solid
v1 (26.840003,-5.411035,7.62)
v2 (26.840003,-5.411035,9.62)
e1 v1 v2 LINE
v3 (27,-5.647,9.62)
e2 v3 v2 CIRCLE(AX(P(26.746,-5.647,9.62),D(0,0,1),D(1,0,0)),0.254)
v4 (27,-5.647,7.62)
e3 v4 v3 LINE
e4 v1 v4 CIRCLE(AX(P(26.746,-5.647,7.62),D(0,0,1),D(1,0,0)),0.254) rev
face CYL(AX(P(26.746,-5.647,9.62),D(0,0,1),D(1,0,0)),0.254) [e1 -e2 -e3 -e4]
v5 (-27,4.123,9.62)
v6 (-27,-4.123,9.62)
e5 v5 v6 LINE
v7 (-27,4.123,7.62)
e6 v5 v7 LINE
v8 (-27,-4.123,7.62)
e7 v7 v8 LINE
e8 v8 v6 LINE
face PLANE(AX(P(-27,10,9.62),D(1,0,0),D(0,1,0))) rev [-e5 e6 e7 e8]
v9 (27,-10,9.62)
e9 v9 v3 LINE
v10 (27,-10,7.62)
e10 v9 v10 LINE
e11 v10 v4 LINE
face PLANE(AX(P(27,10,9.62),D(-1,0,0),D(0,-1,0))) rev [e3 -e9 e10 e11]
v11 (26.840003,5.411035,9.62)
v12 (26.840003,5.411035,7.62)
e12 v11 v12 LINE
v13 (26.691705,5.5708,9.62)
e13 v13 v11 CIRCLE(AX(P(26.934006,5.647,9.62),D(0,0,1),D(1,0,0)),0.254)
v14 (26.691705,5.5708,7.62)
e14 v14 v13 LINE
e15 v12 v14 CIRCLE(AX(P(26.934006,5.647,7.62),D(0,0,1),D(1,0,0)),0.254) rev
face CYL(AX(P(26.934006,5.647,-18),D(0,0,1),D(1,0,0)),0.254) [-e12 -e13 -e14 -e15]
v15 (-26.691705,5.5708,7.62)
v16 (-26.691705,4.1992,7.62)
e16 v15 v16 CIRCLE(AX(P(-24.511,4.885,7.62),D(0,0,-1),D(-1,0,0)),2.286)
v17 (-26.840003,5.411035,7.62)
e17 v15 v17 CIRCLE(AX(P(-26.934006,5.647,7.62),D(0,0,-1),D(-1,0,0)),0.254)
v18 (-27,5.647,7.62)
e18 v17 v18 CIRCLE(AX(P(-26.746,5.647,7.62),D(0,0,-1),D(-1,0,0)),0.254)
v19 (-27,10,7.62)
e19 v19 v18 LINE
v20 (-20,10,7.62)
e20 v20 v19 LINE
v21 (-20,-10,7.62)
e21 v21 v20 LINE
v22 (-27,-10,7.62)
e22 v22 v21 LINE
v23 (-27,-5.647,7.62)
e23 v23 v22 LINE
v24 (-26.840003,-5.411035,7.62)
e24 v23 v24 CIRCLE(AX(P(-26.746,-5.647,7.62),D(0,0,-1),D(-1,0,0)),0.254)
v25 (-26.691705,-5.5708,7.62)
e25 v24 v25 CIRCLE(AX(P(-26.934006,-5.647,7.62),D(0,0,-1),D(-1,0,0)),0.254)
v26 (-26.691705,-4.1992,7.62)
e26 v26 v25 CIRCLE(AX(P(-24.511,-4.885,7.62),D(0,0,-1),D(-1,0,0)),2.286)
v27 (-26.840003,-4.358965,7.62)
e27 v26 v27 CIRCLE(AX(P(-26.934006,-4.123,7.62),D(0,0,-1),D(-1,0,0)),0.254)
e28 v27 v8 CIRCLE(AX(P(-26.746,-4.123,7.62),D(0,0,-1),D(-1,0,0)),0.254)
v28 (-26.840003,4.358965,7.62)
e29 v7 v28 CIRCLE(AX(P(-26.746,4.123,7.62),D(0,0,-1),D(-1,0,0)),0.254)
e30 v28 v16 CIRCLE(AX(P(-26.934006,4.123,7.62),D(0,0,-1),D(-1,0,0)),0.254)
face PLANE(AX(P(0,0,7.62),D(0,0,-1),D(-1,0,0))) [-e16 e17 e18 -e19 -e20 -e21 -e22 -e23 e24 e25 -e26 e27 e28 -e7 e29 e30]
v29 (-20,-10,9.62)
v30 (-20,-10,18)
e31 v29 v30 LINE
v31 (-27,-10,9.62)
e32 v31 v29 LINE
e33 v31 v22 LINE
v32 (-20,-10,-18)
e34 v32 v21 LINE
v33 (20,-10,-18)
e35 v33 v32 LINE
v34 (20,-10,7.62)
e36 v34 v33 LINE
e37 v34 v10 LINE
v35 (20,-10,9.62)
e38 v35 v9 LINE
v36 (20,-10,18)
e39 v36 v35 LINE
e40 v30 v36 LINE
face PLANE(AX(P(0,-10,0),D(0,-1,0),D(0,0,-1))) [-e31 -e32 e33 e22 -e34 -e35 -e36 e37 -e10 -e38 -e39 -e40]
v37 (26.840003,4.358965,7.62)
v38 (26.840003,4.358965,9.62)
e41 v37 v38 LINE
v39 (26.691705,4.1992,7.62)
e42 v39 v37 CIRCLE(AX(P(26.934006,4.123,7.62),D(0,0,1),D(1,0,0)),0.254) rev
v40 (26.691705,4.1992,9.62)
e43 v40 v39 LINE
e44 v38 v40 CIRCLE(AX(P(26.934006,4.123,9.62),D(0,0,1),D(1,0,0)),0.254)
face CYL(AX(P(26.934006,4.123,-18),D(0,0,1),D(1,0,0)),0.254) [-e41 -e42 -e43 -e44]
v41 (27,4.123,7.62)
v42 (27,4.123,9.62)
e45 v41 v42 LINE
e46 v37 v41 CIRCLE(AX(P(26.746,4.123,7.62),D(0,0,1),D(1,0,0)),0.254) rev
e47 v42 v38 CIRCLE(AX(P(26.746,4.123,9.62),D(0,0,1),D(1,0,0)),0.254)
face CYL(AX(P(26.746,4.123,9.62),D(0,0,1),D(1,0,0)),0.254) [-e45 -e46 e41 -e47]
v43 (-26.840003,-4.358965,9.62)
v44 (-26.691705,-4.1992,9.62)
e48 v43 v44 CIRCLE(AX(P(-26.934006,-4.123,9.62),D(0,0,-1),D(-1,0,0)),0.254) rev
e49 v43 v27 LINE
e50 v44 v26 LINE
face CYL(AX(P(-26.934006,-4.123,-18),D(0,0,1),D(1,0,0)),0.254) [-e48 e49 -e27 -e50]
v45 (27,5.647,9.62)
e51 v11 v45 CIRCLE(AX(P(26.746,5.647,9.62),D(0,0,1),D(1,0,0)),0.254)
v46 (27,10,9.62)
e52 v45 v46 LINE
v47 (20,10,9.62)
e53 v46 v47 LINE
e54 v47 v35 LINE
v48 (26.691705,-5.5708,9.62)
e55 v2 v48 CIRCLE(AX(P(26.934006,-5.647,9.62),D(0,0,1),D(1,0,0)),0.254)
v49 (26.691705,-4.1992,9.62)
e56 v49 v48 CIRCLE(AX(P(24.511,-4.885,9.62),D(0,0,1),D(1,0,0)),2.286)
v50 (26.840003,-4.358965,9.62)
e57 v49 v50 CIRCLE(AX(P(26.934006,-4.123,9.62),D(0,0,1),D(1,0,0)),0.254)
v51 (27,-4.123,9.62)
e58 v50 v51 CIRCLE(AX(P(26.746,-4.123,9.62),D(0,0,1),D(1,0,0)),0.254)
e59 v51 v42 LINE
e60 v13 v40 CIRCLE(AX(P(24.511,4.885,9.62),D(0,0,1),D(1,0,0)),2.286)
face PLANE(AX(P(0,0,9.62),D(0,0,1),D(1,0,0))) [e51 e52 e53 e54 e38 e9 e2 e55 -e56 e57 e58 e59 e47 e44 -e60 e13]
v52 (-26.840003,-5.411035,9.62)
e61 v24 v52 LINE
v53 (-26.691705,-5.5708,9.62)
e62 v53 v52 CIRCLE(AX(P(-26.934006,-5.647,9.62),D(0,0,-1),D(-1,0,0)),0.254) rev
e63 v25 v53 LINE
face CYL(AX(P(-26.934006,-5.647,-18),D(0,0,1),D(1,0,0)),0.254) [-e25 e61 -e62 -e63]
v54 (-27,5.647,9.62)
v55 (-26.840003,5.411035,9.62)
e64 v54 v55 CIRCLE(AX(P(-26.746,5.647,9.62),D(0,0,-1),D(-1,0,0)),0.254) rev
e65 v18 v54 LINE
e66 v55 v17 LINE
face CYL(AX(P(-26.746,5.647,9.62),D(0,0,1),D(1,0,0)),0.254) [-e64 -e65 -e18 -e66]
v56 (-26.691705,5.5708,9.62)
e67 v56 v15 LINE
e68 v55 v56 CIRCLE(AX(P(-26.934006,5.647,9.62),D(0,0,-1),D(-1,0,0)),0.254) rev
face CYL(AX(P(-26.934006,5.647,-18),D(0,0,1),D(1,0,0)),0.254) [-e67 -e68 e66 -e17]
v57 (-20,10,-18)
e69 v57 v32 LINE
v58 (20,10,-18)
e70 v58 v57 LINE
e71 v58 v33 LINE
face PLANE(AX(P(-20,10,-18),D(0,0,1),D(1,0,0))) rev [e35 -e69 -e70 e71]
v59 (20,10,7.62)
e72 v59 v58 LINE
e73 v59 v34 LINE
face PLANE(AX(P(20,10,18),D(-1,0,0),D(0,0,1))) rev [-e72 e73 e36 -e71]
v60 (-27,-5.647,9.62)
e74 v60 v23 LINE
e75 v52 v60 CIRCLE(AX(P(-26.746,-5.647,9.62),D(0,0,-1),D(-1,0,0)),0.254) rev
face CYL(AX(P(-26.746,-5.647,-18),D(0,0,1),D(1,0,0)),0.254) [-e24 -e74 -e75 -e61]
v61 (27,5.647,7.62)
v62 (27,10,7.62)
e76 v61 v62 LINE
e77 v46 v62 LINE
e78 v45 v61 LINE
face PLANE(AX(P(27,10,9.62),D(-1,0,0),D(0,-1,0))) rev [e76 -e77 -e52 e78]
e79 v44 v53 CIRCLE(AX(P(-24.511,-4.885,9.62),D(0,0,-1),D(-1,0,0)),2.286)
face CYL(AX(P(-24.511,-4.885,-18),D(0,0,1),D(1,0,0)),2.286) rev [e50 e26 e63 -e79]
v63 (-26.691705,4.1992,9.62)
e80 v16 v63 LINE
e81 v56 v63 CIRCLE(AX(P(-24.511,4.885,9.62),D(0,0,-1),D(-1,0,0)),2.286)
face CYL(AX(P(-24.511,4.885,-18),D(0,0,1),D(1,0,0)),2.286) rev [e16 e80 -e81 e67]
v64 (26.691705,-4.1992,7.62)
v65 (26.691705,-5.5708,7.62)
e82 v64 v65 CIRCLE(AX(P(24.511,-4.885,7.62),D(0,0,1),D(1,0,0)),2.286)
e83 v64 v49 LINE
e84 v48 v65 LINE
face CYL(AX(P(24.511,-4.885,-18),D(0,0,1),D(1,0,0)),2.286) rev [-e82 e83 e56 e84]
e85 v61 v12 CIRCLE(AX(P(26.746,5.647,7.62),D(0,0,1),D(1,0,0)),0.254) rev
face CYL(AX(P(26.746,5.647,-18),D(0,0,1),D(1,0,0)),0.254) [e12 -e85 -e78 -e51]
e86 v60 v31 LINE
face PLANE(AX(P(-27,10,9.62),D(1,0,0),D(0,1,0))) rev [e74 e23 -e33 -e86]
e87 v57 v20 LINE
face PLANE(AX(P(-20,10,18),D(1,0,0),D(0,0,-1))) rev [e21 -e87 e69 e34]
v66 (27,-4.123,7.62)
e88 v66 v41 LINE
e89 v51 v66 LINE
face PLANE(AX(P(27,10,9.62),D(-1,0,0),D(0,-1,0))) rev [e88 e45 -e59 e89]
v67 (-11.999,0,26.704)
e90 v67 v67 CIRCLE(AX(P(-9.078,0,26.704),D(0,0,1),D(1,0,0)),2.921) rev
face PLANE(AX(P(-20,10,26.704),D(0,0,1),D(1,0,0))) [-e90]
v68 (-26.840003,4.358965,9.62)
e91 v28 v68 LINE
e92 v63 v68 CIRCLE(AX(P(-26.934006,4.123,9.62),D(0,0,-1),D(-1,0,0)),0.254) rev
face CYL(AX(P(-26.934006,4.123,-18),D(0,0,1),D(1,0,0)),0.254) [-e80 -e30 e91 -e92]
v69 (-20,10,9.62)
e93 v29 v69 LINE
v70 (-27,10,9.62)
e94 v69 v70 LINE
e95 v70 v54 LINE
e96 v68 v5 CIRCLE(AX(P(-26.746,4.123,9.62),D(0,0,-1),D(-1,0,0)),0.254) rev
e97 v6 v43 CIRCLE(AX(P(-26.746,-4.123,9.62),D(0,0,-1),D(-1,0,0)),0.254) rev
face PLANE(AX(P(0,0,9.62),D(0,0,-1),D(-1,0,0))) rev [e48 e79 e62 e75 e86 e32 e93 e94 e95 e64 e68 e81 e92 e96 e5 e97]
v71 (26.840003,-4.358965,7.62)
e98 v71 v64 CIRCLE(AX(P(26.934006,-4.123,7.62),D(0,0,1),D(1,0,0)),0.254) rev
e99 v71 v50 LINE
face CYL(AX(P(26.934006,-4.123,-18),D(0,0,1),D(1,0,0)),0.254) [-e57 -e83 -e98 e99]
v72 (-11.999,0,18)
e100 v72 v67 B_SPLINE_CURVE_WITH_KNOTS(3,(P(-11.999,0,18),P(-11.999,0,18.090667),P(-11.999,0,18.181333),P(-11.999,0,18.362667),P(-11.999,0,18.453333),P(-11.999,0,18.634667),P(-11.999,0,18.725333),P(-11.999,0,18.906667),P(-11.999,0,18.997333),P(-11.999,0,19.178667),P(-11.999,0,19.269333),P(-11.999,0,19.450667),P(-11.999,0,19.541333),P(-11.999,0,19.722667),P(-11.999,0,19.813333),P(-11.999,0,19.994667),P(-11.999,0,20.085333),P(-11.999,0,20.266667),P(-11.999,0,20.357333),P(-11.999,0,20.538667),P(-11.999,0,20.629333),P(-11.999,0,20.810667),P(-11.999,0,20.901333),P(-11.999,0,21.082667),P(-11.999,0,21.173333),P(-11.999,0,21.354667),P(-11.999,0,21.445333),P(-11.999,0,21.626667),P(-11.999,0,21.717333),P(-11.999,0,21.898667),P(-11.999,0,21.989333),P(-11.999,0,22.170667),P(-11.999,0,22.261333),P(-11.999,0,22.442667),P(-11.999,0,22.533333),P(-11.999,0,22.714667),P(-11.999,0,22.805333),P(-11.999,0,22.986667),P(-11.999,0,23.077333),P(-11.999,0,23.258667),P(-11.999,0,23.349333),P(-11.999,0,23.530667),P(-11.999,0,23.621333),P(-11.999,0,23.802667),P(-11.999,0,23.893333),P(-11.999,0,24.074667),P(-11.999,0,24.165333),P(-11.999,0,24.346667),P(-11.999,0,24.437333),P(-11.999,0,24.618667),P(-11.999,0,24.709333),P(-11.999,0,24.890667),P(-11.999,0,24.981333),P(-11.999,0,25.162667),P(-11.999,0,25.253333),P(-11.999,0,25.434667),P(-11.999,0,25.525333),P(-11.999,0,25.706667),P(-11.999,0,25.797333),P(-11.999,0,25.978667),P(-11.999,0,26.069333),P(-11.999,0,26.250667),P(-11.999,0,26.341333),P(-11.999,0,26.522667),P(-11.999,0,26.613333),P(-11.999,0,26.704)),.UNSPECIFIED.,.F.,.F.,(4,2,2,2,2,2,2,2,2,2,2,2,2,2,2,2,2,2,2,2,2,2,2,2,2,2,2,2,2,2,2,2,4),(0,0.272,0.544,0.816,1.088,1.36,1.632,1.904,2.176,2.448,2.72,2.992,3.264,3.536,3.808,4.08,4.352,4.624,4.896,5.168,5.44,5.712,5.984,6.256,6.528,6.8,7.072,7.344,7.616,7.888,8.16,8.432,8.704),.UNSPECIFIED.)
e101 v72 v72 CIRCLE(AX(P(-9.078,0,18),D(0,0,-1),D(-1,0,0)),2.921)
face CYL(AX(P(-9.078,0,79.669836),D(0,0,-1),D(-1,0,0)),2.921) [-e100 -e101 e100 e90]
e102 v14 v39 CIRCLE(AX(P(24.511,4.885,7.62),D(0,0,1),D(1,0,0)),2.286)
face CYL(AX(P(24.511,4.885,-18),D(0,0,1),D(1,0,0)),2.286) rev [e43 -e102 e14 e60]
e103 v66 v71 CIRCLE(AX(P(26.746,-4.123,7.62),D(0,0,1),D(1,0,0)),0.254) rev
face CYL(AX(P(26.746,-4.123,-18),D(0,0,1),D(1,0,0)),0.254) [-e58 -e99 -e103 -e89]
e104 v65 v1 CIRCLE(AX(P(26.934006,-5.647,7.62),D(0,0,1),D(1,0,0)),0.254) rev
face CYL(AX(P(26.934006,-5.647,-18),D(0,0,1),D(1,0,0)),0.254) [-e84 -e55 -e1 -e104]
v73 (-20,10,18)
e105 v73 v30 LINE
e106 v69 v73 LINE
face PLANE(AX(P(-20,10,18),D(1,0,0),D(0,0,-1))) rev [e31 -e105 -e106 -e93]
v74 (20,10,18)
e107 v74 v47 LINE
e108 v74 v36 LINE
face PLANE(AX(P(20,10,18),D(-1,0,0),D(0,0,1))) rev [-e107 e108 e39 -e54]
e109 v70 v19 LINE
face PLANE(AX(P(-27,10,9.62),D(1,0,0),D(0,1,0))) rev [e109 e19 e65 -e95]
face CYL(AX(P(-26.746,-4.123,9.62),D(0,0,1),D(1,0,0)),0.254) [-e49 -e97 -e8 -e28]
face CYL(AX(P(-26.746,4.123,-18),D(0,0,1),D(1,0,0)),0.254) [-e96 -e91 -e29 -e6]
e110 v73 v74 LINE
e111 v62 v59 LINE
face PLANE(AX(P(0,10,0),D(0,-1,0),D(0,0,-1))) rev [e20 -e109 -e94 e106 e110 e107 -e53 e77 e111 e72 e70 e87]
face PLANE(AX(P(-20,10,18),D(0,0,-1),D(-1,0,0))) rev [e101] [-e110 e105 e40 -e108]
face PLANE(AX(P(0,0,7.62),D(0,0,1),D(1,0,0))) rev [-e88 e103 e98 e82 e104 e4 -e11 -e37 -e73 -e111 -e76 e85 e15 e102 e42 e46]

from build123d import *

# Parameters (mm, degrees)
SKETCH1_W               = 40
SKETCH1_H               = 36
BOSS_EXTRUDE1_DEPTH     = 10
BOSS_EXTRUDE2_START     = 7.62
SKETCH2_W               = 7
SKETCH2_H               = 20
BOSS_EXTRUDE2_DEPTH     = 2
CUT_EXTRUDE1_DEPTH      = 34.955853693
CUT_EXTRUDE1_DEPTH_BACK = 34.955853693
FILLET1_R               = 0.254
BOSS_EXTRUDE4_START     = 18
SKETCH5_R               = 2.921
BOSS_EXTRUDE4_DEPTH     = 8.704


with BuildPart() as part:
    # Sketch1 → Boss-Extrude1 (new, symmetric)
    with BuildSketch(Plane(origin=(0, 0, 0), x_dir=(1, 0, 0), z_dir=(0, 1, 0))):
        Rectangle(SKETCH1_W, SKETCH1_H)
    extrude(amount=BOSS_EXTRUDE1_DEPTH, both=True)

    # Sketch2 → Boss-Extrude2 (add)
    with BuildSketch(Plane.XY.offset(BOSS_EXTRUDE2_START)):
        with Locations((-23.5, 0)):
            Rectangle(SKETCH2_W, SKETCH2_H)
        with Locations((23.5, 0)):
            Rectangle(SKETCH2_W, SKETCH2_H)
    extrude(amount=BOSS_EXTRUDE2_DEPTH)

    # Sketch4 → Cut-Extrude1 (cut, two sides: drawn at the far end of the back side and taken through both)
    with BuildSketch(Plane.XY.offset(-CUT_EXTRUDE1_DEPTH_BACK)):
        with BuildLine():
            Line((-27, 5.393), (-26.739840954, 5.393))
            ThreePointArc((-26.739840954, 5.393), (-22.225, 4.885), (-26.739840954, 4.377))
            Line((-26.739840954, 4.377), (-27, 4.377))
            Line((-27, 4.377), (-27, 5.393))
        make_face()
        with BuildLine():
            Line((27, 4.377), (26.739840954, 4.377))
            ThreePointArc((26.739840954, 4.377), (22.225, 4.885), (26.739840954, 5.393))
            Line((26.739840954, 5.393), (27, 5.393))
            Line((27, 5.393), (27, 4.377))
        make_face()
        with BuildLine():
            Line((27, -5.393), (26.739840954, -5.393))
            ThreePointArc((26.739840954, -5.393), (22.225, -4.885), (26.739840954, -4.377))
            Line((26.739840954, -4.377), (27, -4.377))
            Line((27, -4.377), (27, -5.393))
        make_face()
        with BuildLine():
            Line((-27, -4.377), (-26.739840954, -4.377))
            ThreePointArc((-26.739840954, -4.377), (-22.225, -4.885), (-26.739840954, -5.393))
            Line((-26.739840954, -5.393), (-27, -5.393))
            Line((-27, -5.393), (-27, -4.377))
        make_face()
    extrude(amount=CUT_EXTRUDE1_DEPTH + CUT_EXTRUDE1_DEPTH_BACK, mode=Mode.SUBTRACT)

    # Fillet1
    # the kernel refuses this fillet: 0.254 mm, written as the material it takes off along each edge
    with BuildSketch(Plane(origin=(26.739840954, -5.393, 7.134588457), x_dir=(1, 0, 0), z_dir=(0, 0, 1)), Plane(origin=(26.739840954, 4.377, 7.134588457), x_dir=(1, 0, 0), z_dir=(0, 0, 1))) as fillet1_piece_1:
        with BuildLine():
            CenterArc((0.194164617, -0.254), FILLET1_R, 90, 72.542396876)
            ThreePointArc((-0.04813594, -0.1778), (-0.022276402, -0.089385033), (0, 0))
            Line((0, 0), (0.194164617, 0))
        make_face()
    extrude(amount=2.970823086, mode=Mode.SUBTRACT)
    with BuildSketch(Plane(origin=(27, -4.377, 10.255), x_dir=(-1, 0, 0), z_dir=(0, 0, -1)), Plane(origin=(-27, 5.393, 10.255), x_dir=(0, 1, 0), z_dir=(0, 0, -1)), Plane(origin=(27, 4.377, 10.255), x_dir=(0, -1, 0), z_dir=(0, 0, -1)), Plane(origin=(27, -5.393, 10.255), x_dir=(0, -1, 0), z_dir=(0, 0, -1))) as fillet1_piece_2:
        with BuildLine():
            CenterArc((FILLET1_R, FILLET1_R), FILLET1_R, 180, 90)
            Line((0, FILLET1_R), (0, 0))
            Line((0, 0), (FILLET1_R, 0))
        make_face()
    extrude(amount=3.27, mode=Mode.SUBTRACT)
    with BuildSketch(Plane(origin=(26.739840954, 5.393, 7.134588457), x_dir=(-0.2613232863533324, 0.9652513351503299, 0), z_dir=(0, 0, 1)), Plane(origin=(26.739840954, -4.377, 7.134588457), x_dir=(-0.26132328635333724, 0.9652513351503285, 0), z_dir=(0, 0, 1))) as fillet1_piece_3:
        with BuildLine():
            CenterArc((0.194434103, -0.253793771), FILLET1_R, 92.309007358, 72.542396876)
            Line((-0.050739736, -0.187417656), (0, 0))
            ThreePointArc((0, 0), (0.092100365, -0.001856063), (0.184200729, 0))
        make_face()
    extrude(amount=2.970823086, mode=Mode.SUBTRACT)
    with BuildSketch(Plane(origin=(-27, -5.393, 10.255), x_dir=(0, -1, 0), z_dir=(0, 0, -1)), Plane(origin=(-27, -4.377, 10.255), x_dir=(1, 0, 0), z_dir=(0, 0, -1)), Plane(origin=(-27, 4.377, 10.255), x_dir=(0, -1, 0), z_dir=(0, 0, -1)), Plane(origin=(27, 5.393, 10.255), x_dir=(0, 1, 0), z_dir=(0, 0, -1))) as fillet1_piece_4:
        with BuildLine():
            CenterArc((FILLET1_R, -FILLET1_R), FILLET1_R, 90, 90)
            Line((0, -FILLET1_R), (0, 0))
            Line((0, 0), (FILLET1_R, 0))
        make_face()
    extrude(amount=3.27, mode=Mode.SUBTRACT)
    with BuildSketch(Plane(origin=(-26.739840954, -5.393, 7.134588457), x_dir=(-1, 0, 0), z_dir=(0, 0, 1)), Plane(origin=(-26.739840954, 4.377, 7.134588457), x_dir=(-1, 0, 0), z_dir=(0, 0, 1))) as fillet1_piece_5:
        with BuildLine():
            CenterArc((0.194164617, 0.254), FILLET1_R, 197.457603124, 72.542396876)
            ThreePointArc((-0.04813594, 0.1778), (-0.022276402, 0.089385033), (0, 0))
            Line((0, 0), (0.194164617, 0))
        make_face()
    extrude(amount=2.970823086, mode=Mode.SUBTRACT)
    with BuildSketch(Plane(origin=(-26.739840954, -4.377, 7.134588457), x_dir=(0.2613232863533336, 0.9652513351503295, 0), z_dir=(0, 0, 1)), Plane(origin=(-26.739840954, 5.393, 7.134588457), x_dir=(0.2613232863533336, 0.9652513351503295, 0), z_dir=(0, 0, 1))) as fillet1_piece_6:
        with BuildLine():
            CenterArc((0.194434103, 0.253793771), FILLET1_R, 195.148595765, 72.542396876)
            Line((-0.050739736, 0.187417656), (0, 0))
            ThreePointArc((0, 0), (0.092100365, 0.001856063), (0.184200729, 0))
        make_face()
    extrude(amount=2.970823086, mode=Mode.SUBTRACT)

    # Sketch5 → Boss-Extrude4 (add)
    with BuildSketch(Plane.XY.offset(BOSS_EXTRUDE4_START)):
        with Locations(Location((-9.078, 0, 0), (0, 0, 180))):
            Circle(SKETCH5_R)
    extrude(amount=BOSS_EXTRUDE4_DEPTH)


solid = part.part
